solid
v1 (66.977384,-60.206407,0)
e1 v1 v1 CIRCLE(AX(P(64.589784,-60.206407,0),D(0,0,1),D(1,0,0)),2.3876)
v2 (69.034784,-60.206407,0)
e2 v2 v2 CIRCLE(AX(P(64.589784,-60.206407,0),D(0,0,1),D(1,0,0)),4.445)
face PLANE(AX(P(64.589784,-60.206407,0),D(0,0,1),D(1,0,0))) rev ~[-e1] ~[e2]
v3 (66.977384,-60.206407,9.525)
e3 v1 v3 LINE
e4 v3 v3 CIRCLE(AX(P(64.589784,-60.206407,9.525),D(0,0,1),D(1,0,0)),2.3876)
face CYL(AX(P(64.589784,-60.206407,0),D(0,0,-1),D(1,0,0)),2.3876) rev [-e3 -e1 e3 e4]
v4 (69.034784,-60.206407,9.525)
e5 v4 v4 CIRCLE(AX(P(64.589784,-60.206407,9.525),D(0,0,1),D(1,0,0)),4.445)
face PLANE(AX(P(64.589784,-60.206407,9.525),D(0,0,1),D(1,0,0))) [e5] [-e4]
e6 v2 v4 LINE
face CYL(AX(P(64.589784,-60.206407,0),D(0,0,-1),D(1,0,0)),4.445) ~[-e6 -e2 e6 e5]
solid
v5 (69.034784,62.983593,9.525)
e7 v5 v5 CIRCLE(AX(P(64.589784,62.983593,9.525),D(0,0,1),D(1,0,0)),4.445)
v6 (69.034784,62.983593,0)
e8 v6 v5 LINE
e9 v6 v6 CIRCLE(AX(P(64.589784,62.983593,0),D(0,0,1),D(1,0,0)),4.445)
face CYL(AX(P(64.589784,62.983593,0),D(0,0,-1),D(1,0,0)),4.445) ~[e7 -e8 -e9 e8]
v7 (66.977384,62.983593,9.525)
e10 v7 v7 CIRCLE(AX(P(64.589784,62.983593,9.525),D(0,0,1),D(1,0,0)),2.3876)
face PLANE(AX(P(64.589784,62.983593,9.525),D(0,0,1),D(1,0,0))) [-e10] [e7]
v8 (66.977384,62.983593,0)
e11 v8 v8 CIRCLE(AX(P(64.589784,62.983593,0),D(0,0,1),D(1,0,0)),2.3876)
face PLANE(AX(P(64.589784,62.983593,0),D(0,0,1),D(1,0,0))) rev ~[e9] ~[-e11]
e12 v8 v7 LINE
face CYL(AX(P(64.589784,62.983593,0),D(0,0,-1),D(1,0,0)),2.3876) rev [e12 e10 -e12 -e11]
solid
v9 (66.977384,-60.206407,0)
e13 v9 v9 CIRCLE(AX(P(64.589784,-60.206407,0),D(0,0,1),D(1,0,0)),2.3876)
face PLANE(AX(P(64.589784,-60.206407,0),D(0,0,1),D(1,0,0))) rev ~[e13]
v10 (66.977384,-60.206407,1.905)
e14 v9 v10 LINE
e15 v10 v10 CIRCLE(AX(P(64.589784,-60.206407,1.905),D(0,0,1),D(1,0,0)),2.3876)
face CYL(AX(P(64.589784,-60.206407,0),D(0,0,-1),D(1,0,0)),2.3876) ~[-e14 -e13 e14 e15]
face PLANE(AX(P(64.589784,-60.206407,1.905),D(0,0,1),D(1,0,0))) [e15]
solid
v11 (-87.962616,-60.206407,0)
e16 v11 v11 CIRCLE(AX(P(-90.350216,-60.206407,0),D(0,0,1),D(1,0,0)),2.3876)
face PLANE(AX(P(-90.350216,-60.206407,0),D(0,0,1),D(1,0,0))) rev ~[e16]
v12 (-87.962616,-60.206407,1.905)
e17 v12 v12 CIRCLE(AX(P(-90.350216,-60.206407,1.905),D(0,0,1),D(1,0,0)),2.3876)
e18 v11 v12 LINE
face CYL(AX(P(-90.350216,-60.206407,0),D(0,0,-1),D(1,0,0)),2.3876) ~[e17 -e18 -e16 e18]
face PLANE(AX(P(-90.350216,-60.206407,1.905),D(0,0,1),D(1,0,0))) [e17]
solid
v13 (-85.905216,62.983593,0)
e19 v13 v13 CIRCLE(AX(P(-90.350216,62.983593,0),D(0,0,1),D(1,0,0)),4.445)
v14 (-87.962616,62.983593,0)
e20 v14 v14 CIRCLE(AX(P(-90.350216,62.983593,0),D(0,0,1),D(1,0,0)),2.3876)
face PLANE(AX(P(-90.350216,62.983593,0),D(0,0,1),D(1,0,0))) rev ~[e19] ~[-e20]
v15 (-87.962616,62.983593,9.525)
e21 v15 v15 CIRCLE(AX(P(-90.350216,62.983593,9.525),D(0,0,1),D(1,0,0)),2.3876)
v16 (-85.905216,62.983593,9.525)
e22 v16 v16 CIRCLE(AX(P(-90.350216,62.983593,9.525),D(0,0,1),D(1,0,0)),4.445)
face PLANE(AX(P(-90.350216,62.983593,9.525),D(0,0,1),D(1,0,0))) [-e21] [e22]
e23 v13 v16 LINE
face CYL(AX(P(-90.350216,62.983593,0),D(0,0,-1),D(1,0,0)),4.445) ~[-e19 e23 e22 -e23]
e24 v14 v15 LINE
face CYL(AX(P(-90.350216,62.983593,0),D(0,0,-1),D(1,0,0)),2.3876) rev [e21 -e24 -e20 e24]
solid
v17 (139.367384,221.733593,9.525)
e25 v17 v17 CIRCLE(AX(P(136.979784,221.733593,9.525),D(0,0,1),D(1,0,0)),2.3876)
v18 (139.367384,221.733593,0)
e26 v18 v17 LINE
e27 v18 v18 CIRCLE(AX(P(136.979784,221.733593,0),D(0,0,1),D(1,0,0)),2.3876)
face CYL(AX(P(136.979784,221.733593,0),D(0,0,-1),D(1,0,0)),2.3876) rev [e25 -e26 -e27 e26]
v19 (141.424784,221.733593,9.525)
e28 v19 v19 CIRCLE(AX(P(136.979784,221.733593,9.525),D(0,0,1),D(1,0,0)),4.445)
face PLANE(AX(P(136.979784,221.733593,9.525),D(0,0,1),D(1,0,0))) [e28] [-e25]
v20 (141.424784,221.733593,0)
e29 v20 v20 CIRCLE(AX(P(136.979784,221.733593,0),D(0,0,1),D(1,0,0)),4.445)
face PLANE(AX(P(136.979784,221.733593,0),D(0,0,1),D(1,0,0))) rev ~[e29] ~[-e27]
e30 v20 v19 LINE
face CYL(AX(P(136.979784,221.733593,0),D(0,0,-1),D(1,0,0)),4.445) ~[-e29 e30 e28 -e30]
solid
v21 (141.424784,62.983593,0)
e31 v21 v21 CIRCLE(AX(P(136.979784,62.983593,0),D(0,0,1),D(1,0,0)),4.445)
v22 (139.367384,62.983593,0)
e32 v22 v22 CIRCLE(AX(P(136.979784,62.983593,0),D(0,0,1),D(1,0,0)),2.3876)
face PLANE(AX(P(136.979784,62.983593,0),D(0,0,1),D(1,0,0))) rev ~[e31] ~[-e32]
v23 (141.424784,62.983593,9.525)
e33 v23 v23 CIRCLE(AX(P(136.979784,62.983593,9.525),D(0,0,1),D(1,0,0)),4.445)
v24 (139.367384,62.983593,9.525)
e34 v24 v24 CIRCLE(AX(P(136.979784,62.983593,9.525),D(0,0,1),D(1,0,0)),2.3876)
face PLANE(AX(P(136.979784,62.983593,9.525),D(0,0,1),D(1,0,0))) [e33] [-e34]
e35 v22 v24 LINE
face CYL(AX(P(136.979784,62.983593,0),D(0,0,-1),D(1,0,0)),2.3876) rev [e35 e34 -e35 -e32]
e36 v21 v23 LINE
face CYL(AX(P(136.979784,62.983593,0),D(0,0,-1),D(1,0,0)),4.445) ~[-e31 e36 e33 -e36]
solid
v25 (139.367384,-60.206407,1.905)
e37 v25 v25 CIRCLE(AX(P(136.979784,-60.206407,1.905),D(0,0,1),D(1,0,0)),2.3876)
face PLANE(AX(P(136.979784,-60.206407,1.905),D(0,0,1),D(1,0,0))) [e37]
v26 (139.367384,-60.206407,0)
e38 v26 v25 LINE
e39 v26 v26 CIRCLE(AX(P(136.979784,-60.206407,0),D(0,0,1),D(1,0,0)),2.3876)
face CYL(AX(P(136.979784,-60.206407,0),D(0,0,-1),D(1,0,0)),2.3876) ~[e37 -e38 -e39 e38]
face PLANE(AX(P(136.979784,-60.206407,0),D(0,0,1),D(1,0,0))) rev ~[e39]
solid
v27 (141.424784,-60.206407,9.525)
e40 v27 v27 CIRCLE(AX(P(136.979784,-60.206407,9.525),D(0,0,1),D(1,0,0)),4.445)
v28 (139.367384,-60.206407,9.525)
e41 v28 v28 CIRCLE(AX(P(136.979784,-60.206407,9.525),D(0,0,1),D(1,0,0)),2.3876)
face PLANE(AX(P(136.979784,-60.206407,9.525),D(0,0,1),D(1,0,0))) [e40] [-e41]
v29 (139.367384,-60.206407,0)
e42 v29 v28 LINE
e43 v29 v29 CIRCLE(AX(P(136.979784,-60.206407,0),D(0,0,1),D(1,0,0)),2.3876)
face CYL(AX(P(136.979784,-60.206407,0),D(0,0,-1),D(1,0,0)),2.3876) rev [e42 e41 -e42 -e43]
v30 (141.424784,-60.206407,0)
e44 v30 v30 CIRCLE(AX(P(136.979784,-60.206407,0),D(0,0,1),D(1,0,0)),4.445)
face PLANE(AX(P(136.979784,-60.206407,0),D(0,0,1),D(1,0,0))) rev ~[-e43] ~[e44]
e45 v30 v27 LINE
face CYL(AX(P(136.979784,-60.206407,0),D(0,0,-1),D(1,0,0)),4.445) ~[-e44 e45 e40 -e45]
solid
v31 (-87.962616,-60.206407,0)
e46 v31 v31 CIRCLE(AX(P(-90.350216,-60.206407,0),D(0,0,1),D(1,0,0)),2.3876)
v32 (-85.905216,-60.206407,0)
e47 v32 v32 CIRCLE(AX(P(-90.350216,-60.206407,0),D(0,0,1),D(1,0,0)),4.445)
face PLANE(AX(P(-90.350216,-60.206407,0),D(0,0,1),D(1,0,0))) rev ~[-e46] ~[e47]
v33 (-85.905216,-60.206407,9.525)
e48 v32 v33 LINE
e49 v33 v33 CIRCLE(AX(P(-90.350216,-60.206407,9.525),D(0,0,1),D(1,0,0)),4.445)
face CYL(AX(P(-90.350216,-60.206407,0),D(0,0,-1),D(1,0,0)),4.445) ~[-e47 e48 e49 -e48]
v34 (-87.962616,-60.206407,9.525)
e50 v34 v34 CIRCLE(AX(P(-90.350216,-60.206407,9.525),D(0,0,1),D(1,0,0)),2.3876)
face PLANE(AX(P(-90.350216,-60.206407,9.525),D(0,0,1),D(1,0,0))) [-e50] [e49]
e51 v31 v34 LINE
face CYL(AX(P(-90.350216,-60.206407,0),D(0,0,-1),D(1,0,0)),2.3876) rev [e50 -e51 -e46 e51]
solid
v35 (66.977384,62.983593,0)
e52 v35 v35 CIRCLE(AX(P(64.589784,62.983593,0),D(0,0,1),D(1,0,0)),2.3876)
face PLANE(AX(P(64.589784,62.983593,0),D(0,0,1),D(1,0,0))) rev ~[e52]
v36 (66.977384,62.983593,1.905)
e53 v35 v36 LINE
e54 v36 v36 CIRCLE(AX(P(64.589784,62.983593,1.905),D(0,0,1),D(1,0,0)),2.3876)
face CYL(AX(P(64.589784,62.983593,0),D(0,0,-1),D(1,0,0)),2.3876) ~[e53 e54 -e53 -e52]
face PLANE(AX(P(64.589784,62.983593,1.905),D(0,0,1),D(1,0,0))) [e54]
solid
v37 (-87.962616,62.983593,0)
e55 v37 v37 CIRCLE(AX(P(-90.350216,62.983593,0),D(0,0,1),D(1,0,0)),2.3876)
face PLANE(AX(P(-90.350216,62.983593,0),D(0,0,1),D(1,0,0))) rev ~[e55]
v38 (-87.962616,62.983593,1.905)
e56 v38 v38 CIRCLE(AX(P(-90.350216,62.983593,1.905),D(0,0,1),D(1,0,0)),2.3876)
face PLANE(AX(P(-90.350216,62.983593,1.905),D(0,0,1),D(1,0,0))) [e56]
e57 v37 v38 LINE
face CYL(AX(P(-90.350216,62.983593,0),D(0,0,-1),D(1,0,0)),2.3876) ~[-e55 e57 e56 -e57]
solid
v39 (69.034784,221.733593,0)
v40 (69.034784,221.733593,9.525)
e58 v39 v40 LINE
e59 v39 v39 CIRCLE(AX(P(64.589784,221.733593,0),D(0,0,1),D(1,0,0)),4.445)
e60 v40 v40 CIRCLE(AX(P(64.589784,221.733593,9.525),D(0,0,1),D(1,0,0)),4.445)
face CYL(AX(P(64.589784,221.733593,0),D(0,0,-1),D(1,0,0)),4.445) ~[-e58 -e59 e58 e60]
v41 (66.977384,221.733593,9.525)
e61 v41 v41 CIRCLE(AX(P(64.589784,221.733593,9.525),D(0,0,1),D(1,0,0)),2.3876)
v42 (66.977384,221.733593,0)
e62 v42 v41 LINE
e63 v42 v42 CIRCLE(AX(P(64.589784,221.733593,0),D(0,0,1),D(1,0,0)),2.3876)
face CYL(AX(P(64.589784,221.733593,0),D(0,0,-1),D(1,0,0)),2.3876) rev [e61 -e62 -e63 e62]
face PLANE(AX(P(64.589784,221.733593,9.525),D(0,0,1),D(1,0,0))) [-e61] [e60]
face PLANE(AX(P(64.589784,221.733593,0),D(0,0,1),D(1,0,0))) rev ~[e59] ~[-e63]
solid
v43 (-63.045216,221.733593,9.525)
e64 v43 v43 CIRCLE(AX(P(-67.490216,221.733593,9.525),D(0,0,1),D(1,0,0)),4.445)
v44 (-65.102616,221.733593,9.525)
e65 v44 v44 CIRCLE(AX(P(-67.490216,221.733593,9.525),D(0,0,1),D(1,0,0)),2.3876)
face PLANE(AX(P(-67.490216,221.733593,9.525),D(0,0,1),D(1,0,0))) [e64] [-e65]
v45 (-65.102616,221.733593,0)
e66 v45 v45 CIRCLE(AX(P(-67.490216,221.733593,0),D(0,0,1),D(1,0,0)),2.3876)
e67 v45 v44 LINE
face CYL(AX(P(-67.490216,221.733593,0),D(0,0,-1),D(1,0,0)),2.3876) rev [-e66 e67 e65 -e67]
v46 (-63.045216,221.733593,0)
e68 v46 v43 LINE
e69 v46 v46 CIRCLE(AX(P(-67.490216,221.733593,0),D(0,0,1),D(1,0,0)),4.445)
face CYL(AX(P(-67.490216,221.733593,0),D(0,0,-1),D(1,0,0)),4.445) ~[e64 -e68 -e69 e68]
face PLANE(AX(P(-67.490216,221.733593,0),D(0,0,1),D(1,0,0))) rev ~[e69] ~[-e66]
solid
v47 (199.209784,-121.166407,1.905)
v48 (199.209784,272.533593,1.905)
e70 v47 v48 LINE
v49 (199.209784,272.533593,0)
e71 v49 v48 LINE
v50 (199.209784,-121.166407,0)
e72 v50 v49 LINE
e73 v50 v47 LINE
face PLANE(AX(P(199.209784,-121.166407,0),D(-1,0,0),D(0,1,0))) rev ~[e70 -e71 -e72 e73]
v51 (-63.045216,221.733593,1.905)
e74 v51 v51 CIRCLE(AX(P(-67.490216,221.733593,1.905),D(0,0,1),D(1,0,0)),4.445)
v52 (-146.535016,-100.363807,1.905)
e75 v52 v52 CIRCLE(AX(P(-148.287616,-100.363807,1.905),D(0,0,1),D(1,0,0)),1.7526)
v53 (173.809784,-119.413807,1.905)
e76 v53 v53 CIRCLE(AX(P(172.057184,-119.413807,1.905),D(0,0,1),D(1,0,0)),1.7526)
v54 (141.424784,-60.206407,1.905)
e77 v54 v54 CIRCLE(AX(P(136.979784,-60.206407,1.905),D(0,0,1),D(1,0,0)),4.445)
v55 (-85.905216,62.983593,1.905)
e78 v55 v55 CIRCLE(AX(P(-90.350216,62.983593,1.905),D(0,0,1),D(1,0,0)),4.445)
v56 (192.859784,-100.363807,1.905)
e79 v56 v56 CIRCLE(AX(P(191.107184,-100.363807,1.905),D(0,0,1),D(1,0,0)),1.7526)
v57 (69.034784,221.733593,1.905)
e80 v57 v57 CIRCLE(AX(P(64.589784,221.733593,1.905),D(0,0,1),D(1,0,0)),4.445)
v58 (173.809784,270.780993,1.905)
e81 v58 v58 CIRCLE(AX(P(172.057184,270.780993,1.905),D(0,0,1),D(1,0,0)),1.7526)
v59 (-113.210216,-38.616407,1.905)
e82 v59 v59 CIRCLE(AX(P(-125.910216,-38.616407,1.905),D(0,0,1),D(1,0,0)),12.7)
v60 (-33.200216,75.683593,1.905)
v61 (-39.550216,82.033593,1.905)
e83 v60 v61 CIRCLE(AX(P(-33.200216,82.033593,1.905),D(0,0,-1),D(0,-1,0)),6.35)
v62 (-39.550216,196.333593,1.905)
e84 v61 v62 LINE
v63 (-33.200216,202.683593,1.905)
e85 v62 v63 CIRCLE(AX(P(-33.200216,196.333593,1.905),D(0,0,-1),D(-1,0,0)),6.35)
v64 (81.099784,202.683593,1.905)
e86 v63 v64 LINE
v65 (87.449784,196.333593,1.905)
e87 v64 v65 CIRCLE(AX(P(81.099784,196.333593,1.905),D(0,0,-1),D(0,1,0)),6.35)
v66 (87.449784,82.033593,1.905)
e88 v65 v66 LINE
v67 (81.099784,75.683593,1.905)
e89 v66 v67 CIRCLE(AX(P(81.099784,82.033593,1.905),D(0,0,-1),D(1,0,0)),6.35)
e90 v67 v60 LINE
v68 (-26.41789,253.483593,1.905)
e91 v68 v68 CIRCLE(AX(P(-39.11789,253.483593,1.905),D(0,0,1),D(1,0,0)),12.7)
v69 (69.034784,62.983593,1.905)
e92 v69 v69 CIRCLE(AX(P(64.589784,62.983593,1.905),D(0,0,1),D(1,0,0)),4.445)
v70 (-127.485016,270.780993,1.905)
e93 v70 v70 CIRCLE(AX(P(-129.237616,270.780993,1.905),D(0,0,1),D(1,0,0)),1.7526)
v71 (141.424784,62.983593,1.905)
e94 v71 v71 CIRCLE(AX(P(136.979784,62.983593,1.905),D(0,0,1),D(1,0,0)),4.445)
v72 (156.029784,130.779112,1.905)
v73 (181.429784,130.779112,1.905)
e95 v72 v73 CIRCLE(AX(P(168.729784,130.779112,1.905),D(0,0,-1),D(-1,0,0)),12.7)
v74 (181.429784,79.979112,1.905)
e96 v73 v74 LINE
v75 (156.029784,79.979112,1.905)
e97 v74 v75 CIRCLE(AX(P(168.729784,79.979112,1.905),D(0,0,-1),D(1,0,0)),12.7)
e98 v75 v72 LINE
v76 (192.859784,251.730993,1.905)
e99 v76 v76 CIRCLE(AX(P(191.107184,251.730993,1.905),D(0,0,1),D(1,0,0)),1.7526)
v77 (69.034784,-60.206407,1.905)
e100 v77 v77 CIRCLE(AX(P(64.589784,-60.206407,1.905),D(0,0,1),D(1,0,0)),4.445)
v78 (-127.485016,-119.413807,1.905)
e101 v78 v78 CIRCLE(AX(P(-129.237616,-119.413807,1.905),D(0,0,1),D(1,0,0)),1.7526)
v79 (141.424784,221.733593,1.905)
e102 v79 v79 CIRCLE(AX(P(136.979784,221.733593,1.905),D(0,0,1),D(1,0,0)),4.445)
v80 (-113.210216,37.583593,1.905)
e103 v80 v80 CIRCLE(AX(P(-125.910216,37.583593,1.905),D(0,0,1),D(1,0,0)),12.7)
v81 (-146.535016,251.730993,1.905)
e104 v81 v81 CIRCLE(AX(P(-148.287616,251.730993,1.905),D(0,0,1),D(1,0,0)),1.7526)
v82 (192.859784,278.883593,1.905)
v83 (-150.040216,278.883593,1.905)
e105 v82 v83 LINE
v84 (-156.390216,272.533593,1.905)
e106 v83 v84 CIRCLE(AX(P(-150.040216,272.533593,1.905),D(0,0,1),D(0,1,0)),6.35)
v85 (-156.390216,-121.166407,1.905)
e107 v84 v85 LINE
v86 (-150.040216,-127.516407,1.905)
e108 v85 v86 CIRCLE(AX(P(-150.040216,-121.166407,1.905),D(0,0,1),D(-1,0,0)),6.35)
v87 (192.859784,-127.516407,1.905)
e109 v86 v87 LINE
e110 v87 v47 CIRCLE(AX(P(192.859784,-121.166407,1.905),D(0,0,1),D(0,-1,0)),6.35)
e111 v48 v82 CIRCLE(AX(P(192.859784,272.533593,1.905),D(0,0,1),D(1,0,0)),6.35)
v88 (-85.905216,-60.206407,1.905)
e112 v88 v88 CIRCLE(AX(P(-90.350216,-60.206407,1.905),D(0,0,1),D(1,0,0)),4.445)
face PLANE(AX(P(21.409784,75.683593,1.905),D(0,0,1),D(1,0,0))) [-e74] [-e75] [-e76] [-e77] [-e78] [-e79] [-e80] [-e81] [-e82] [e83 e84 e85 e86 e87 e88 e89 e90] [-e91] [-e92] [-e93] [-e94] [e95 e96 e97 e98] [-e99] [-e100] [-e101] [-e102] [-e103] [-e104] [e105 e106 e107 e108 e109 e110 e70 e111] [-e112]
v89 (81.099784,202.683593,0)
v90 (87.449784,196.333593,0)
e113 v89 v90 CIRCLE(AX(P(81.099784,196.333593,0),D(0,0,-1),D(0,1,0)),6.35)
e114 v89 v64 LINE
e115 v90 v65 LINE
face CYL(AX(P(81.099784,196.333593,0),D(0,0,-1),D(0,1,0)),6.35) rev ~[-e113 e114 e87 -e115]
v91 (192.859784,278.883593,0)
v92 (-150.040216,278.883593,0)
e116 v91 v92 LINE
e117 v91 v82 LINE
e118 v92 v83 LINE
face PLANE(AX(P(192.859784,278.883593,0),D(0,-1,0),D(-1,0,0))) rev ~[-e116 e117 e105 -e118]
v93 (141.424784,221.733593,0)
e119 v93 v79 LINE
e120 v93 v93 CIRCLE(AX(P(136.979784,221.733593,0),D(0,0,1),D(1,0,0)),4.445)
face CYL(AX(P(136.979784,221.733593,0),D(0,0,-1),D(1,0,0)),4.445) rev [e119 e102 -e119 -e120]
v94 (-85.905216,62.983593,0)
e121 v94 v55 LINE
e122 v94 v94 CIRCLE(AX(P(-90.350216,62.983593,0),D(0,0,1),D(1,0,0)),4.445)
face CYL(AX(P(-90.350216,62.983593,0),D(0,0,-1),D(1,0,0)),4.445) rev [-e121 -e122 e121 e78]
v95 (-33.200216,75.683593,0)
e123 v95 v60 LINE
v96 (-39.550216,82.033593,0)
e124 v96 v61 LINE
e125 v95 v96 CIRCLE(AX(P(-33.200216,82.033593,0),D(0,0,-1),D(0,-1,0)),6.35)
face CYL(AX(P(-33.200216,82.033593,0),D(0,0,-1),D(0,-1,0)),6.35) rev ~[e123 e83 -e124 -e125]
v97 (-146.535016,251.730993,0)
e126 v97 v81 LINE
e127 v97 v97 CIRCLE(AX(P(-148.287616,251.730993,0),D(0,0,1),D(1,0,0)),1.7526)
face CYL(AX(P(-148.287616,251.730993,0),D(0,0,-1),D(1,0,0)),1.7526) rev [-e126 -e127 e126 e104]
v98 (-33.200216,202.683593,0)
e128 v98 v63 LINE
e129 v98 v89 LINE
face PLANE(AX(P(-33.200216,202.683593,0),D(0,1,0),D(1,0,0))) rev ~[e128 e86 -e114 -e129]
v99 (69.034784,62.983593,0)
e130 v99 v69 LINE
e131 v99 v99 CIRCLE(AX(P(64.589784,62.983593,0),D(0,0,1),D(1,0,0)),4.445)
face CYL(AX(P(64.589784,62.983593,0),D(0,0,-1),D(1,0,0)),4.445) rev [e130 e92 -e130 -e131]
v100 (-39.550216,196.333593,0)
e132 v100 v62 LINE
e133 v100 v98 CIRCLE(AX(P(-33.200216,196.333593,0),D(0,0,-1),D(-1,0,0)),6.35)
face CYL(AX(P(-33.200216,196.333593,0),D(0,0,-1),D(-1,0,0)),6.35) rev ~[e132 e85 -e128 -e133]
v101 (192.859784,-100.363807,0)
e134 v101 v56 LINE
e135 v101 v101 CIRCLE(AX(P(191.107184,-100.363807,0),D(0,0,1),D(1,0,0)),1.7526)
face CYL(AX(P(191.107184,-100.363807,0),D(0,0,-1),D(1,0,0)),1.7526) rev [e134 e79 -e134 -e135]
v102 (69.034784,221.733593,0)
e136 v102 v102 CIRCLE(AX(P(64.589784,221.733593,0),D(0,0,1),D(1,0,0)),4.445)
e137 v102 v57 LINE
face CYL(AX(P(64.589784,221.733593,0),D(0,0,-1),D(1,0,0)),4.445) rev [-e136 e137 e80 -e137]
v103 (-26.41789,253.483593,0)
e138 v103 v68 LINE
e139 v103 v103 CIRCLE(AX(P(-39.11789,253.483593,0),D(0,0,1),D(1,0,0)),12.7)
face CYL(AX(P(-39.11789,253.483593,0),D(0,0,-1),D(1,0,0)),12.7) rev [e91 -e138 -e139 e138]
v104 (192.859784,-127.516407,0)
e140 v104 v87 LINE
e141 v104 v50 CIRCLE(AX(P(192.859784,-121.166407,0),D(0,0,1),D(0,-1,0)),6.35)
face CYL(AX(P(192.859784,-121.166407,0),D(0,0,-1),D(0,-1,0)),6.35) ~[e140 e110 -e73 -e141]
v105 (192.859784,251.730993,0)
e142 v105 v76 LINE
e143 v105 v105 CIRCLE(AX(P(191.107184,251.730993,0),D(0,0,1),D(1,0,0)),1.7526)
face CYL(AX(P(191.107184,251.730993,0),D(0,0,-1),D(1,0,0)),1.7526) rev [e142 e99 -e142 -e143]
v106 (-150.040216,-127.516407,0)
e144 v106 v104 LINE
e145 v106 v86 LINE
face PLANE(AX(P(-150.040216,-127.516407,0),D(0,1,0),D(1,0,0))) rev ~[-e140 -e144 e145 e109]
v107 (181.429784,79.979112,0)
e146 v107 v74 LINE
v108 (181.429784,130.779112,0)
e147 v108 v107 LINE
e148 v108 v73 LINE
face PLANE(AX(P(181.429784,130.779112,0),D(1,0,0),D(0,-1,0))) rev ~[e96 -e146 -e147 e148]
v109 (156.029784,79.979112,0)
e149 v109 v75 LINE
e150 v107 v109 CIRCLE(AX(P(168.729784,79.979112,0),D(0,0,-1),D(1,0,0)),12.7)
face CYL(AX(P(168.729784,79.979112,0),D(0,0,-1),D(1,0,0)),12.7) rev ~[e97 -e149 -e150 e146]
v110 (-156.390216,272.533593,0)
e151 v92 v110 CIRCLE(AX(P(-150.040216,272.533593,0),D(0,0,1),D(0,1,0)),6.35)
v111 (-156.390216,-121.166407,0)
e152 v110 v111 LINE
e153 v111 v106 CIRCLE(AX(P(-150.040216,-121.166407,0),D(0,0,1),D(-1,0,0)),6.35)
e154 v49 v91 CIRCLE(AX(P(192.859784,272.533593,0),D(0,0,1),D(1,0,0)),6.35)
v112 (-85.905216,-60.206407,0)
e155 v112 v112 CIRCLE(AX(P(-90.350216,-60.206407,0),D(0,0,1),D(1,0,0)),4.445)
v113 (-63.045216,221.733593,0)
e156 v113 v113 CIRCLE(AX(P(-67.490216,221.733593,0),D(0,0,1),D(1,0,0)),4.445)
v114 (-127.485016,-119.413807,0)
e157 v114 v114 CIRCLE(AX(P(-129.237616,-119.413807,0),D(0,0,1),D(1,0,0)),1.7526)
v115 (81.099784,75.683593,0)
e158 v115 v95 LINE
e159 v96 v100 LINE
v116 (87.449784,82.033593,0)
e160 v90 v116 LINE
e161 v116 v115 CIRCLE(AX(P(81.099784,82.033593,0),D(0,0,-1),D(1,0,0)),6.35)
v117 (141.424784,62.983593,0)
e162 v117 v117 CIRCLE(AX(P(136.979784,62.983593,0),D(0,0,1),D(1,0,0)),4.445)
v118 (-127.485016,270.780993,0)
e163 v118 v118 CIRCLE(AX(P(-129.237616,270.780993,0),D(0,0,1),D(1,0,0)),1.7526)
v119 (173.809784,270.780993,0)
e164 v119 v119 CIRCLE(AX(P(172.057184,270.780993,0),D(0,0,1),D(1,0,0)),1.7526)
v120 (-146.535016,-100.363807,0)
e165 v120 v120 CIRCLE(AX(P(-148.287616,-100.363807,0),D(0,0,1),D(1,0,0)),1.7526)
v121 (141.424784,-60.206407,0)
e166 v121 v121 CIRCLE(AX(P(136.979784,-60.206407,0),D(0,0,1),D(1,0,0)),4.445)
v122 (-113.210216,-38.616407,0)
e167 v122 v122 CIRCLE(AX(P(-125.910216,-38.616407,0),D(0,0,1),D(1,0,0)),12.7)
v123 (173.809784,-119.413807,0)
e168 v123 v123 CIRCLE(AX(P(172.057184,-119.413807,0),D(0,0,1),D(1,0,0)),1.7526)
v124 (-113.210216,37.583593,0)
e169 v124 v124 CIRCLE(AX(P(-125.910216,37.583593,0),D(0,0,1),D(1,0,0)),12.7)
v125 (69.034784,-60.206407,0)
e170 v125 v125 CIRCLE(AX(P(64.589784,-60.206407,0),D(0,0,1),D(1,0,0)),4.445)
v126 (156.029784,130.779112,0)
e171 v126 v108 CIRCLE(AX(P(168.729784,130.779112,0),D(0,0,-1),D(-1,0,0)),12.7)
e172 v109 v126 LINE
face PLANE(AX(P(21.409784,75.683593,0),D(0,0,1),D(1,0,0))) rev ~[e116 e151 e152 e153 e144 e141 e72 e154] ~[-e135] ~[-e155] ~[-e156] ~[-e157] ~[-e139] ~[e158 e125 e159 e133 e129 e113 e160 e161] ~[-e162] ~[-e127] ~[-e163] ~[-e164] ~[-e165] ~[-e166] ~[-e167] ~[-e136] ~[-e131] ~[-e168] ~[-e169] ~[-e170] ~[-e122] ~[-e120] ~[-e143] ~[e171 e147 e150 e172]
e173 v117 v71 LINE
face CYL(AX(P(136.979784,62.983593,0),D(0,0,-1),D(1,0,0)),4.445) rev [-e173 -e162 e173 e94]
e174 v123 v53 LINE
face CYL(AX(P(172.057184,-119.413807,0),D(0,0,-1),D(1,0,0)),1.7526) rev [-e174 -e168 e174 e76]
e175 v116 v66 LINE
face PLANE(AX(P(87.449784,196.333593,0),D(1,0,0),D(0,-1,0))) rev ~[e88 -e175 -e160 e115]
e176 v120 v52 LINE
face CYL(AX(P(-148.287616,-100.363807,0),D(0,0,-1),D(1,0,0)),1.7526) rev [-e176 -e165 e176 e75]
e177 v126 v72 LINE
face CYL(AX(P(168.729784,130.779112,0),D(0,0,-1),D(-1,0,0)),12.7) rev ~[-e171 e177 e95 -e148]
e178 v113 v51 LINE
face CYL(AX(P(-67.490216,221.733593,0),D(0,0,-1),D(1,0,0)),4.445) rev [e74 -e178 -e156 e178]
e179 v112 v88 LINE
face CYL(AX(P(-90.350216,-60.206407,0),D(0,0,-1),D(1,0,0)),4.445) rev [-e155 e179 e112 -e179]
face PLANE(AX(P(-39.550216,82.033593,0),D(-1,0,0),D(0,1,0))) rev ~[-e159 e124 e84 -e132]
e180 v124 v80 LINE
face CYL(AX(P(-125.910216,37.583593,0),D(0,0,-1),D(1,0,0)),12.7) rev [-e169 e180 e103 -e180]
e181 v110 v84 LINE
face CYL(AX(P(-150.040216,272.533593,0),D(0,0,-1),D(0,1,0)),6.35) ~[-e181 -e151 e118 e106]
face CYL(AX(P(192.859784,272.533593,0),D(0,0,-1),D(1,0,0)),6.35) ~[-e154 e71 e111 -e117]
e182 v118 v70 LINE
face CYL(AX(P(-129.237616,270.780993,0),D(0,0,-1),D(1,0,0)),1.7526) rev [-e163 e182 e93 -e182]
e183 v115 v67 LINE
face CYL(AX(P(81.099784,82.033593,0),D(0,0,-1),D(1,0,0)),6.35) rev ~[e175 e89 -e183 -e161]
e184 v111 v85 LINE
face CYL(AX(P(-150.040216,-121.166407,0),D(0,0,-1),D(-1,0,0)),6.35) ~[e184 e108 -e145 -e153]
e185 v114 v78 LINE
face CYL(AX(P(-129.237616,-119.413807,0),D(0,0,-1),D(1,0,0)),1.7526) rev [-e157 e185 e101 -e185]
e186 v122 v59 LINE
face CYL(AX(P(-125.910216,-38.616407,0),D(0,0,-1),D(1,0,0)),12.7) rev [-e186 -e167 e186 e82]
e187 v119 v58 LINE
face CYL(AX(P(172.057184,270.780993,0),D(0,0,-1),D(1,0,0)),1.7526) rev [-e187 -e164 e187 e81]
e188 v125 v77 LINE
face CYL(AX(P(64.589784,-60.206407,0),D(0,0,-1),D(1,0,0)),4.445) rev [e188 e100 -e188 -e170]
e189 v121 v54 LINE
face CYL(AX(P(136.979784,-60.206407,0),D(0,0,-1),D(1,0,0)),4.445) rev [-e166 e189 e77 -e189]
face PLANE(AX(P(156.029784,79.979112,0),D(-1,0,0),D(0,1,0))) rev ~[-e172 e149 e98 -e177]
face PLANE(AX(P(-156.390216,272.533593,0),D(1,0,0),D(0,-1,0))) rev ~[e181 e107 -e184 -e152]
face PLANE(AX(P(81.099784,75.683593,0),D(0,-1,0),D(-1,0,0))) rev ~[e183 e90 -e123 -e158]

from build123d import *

# Parameters (mm, degrees)
F0_R     = 1.7526
F0_R_2   = 12.7
F0_R_3   = 4.445
F1_DEPTH = 1.905
F0_R_4   = 2.3876
F2_DEPTH = 9.525


# Not quite as in the source:
# - a feature names something its author has since deleted; it is built from what else it names


with BuildPart() as f1:
    # F0 (on Top) → F1 (new body)
    with BuildSketch(Plane.XY):
        with BuildLine():
            Line((192.8597838237, 278.8835931593), (-150.0402161763, 278.8835931593))
            ThreePointArc((-150.0402161763, 278.8835931593), (-154.5303442368, 277.0237212199), (-156.3902161763, 272.5335931593))
            Line((-156.3902161763, 272.5335931593), (-156.3902161763, -121.1664068407))
            ThreePointArc((-156.3902161763, -121.1664068407), (-154.5303442368, -125.6565349012), (-150.0402161763, -127.5164068407))
            Line((-150.0402161763, -127.5164068407), (192.8597838237, -127.5164068407))
            ThreePointArc((192.8597838237, -127.5164068407), (197.3499118843, -125.6565349012), (199.2097838237, -121.1664068407))
            Line((199.2097838237, -121.1664068407), (199.2097838237, 272.5335931593))
            ThreePointArc((199.2097838237, 272.5335931593), (197.3499118843, 277.0237212199), (192.8597838237, 278.8835931593))
        make_face()
        with Locations((-129.2376161763, -119.4138068407)):
            Circle(F0_R, mode=Mode.SUBTRACT)
        with Locations((-148.2876161763, -100.3638068407)):
            Circle(F0_R, mode=Mode.SUBTRACT)
        with Locations((-125.9102161763, -38.6164068407)):
            Circle(F0_R_2, mode=Mode.SUBTRACT)
        with Locations((-125.9102161763, 37.5835931593)):
            Circle(F0_R_2, mode=Mode.SUBTRACT)
        with Locations((172.0571838237, -119.4138068407)):
            Circle(F0_R, mode=Mode.SUBTRACT)
        with Locations((191.1071838237, -100.3638068407)):
            Circle(F0_R, mode=Mode.SUBTRACT)
        with Locations((-148.2876161763, 251.7309931593)):
            Circle(F0_R, mode=Mode.SUBTRACT)
        with Locations((-129.2376161763, 270.7809931593)):
            Circle(F0_R, mode=Mode.SUBTRACT)
        with Locations((-39.1178902483, 253.4835931593)):
            Circle(F0_R_2, mode=Mode.SUBTRACT)
        Polygon((64.5897838237, -76.7164068407), (-100.5102161763, -76.7164068407), (-100.5102161763, 140.7156608748), (-100.5102161763, 228.0835931593), (143.3297838237, 228.0835931593), (143.3297838237, -76.7164068407), align=None, mode=Mode.SUBTRACT)
        with BuildLine():
            Line((156.0297838237, 79.9791118101), (156.0297838237, 130.7791118101))
            ThreePointArc((156.0297838237, 130.7791118101), (168.7297838237, 143.4791118101), (181.4297838237, 130.7791118101))
            Line((181.4297838237, 130.7791118101), (181.4297838237, 79.9791118101))
            ThreePointArc((181.4297838237, 79.9791118101), (168.7297838237, 67.2791118101), (156.0297838237, 79.9791118101))
        make_face(mode=Mode.SUBTRACT)
        with Locations((191.1071838237, 251.7309931593)):
            Circle(F0_R, mode=Mode.SUBTRACT)
        with Locations((172.0571838237, 270.7809931593)):
            Circle(F0_R, mode=Mode.SUBTRACT)
        Polygon((-100.5102161763, 140.7156608748), (-100.5102161763, -76.7164068407), (64.5897838237, -76.7164068407), (143.3297838237, -76.7164068407), (143.3297838237, 228.0835931593), (-100.5102161763, 228.0835931593), align=None)
        with Locations((-90.3502161763, -60.2064068407)):
            Circle(F0_R_3, mode=Mode.SUBTRACT)
        with Locations((-90.3502161763, 62.9835931593)):
            Circle(F0_R_3, mode=Mode.SUBTRACT)
        with Locations((64.5897838237, -60.2064068407)):
            Circle(F0_R_3, mode=Mode.SUBTRACT)
        with Locations((136.9797838237, -60.2064068407)):
            Circle(F0_R_3, mode=Mode.SUBTRACT)
        with Locations((64.5897838237, 62.9835931593)):
            Circle(F0_R_3, mode=Mode.SUBTRACT)
        with Locations((136.9797838237, 62.9835931593)):
            Circle(F0_R_3, mode=Mode.SUBTRACT)
        with Locations((-67.4902161763, 221.7335931593)):
            Circle(F0_R_3, mode=Mode.SUBTRACT)
        with BuildLine():
            Line((-33.2002161763, 202.6835931593), (81.0997838237, 202.6835931593))
            ThreePointArc((81.0997838237, 202.6835931593), (85.5899118843, 200.8237212199), (87.4497838237, 196.3335931593))
            Line((87.4497838237, 196.3335931593), (87.4497838237, 82.0335931593))
            ThreePointArc((87.4497838237, 82.0335931593), (85.5899118843, 77.5434650988), (81.0997838237, 75.6835931593))
            Line((81.0997838237, 75.6835931593), (-33.2002161763, 75.6835931593))
            ThreePointArc((-33.2002161763, 75.6835931593), (-37.6903442368, 77.5434650988), (-39.5502161763, 82.0335931593))
            Line((-39.5502161763, 82.0335931593), (-39.5502161763, 196.3335931593))
            ThreePointArc((-39.5502161763, 196.3335931593), (-37.6903442368, 200.8237212199), (-33.2002161763, 202.6835931593))
        make_face(mode=Mode.SUBTRACT)
        with Locations((64.5897838237, 221.7335931593)):
            Circle(F0_R_3, mode=Mode.SUBTRACT)
        with Locations((136.9797838237, 221.7335931593)):
            Circle(F0_R_3, mode=Mode.SUBTRACT)
    extrude(amount=F1_DEPTH)


with BuildPart() as f1b:
    # F0 (on Top) → F1, piece 2 (new body)
    with BuildSketch(Plane.XY):
        with Locations((64.5897838237, 62.9835931593)):
            Circle(F0_R_4)
    extrude(amount=F1_DEPTH)


with BuildPart() as f1c:
    # F0 (on Top) → F1, piece 3 (new body)
    with BuildSketch(Plane.XY):
        with Locations((-90.3502161763, 62.9835931593)):
            Circle(F0_R_4)
    extrude(amount=F1_DEPTH)


with BuildPart() as f1d:
    # F0 (on Top) → F1, piece 4 (new body)
    with BuildSketch(Plane.XY):
        with Locations((-90.3502161763, -60.2064068407)):
            Circle(F0_R_4)
    extrude(amount=F1_DEPTH)


with BuildPart() as f1e:
    # F0 (on Top) → F1, piece 5 (new body)
    with BuildSketch(Plane.XY):
        with Locations((64.5897838237, -60.2064068407)):
            Circle(F0_R_4)
    extrude(amount=F1_DEPTH)


with BuildPart() as f1f:
    # F0 (on Top) → F1, piece 6 (new body)
    with BuildSketch(Plane.XY):
        with Locations((136.9797838237, -60.2064068407)):
            Circle(F0_R_4)
    extrude(amount=F1_DEPTH)


with BuildPart() as f2:
    # F0 (on Top) → F2 (new body)
    with BuildSketch(Plane.XY):
        with Locations((-90.3502161763, -60.2064068407)):
            Circle(F0_R_3)
        with Locations((-90.3502161763, -60.2064068407)):
            Circle(F0_R_4, mode=Mode.SUBTRACT)
    extrude(amount=F2_DEPTH)


with BuildPart() as f2b:
    # F0 (on Top) → F2, piece 2 (new body)
    with BuildSketch(Plane.XY):
        with Locations((-90.3502161763, 62.9835931593)):
            Circle(F0_R_3)
        with Locations((-90.3502161763, 62.9835931593)):
            Circle(F0_R_4, mode=Mode.SUBTRACT)
    extrude(amount=F2_DEPTH)


with BuildPart() as f2c:
    # F0 (on Top) → F2, piece 3 (new body)
    with BuildSketch(Plane.XY):
        with Locations((64.5897838237, 62.9835931593)):
            Circle(F0_R_3)
        with Locations((64.5897838237, 62.9835931593)):
            Circle(F0_R_4, mode=Mode.SUBTRACT)
    extrude(amount=F2_DEPTH)


with BuildPart() as f2d:
    # F0 (on Top) → F2, piece 4 (new body)
    with BuildSketch(Plane.XY):
        with Locations((136.9797838237, 62.9835931593)):
            Circle(F0_R_3)
        with Locations((136.9797838237, 62.9835931593)):
            Circle(F0_R_4, mode=Mode.SUBTRACT)
    extrude(amount=F2_DEPTH)


with BuildPart() as f2e:
    # F0 (on Top) → F2, piece 5 (new body)
    with BuildSketch(Plane.XY):
        with Locations((64.5897838237, -60.2064068407)):
            Circle(F0_R_3)
        with Locations((64.5897838237, -60.2064068407)):
            Circle(F0_R_4, mode=Mode.SUBTRACT)
    extrude(amount=F2_DEPTH)


with BuildPart() as f2f:
    # F0 (on Top) → F2, piece 6 (new body)
    with BuildSketch(Plane.XY):
        with Locations((136.9797838237, -60.2064068407)):
            Circle(F0_R_3)
        with Locations((136.9797838237, -60.2064068407)):
            Circle(F0_R_4, mode=Mode.SUBTRACT)
    extrude(amount=F2_DEPTH)


with BuildPart() as f2g:
    # F0 (on Top) → F2, piece 7 (new body)
    with BuildSketch(Plane.XY):
        with Locations((136.9797838237, 221.7335931593)):
            Circle(F0_R_3)
        with Locations((136.9797838237, 221.7335931593)):
            Circle(F0_R_4, mode=Mode.SUBTRACT)
    extrude(amount=F2_DEPTH)


with BuildPart() as f2h:
    # F0 (on Top) → F2, piece 8 (new body)
    with BuildSketch(Plane.XY):
        with Locations((64.5897838237, 221.7335931593)):
            Circle(F0_R_3)
        with Locations((64.5897838237, 221.7335931593)):
            Circle(F0_R_4, mode=Mode.SUBTRACT)
    extrude(amount=F2_DEPTH)


with BuildPart() as f2i:
    # F0 (on Top) → F2, piece 9 (new body)
    with BuildSketch(Plane.XY):
        with Locations((-67.4902161763, 221.7335931593)):
            Circle(F0_R_3)
        with Locations((-67.4902161763, 221.7335931593)):
            Circle(F0_R_4, mode=Mode.SUBTRACT)
    extrude(amount=F2_DEPTH)


solid = Compound([f1.part, f1b.part, f1c.part, f1d.part, f1e.part, f1f.part, f2.part, f2b.part, f2c.part, f2d.part, f2e.part, f2f.part, f2g.part, f2h.part, f2i.part])
